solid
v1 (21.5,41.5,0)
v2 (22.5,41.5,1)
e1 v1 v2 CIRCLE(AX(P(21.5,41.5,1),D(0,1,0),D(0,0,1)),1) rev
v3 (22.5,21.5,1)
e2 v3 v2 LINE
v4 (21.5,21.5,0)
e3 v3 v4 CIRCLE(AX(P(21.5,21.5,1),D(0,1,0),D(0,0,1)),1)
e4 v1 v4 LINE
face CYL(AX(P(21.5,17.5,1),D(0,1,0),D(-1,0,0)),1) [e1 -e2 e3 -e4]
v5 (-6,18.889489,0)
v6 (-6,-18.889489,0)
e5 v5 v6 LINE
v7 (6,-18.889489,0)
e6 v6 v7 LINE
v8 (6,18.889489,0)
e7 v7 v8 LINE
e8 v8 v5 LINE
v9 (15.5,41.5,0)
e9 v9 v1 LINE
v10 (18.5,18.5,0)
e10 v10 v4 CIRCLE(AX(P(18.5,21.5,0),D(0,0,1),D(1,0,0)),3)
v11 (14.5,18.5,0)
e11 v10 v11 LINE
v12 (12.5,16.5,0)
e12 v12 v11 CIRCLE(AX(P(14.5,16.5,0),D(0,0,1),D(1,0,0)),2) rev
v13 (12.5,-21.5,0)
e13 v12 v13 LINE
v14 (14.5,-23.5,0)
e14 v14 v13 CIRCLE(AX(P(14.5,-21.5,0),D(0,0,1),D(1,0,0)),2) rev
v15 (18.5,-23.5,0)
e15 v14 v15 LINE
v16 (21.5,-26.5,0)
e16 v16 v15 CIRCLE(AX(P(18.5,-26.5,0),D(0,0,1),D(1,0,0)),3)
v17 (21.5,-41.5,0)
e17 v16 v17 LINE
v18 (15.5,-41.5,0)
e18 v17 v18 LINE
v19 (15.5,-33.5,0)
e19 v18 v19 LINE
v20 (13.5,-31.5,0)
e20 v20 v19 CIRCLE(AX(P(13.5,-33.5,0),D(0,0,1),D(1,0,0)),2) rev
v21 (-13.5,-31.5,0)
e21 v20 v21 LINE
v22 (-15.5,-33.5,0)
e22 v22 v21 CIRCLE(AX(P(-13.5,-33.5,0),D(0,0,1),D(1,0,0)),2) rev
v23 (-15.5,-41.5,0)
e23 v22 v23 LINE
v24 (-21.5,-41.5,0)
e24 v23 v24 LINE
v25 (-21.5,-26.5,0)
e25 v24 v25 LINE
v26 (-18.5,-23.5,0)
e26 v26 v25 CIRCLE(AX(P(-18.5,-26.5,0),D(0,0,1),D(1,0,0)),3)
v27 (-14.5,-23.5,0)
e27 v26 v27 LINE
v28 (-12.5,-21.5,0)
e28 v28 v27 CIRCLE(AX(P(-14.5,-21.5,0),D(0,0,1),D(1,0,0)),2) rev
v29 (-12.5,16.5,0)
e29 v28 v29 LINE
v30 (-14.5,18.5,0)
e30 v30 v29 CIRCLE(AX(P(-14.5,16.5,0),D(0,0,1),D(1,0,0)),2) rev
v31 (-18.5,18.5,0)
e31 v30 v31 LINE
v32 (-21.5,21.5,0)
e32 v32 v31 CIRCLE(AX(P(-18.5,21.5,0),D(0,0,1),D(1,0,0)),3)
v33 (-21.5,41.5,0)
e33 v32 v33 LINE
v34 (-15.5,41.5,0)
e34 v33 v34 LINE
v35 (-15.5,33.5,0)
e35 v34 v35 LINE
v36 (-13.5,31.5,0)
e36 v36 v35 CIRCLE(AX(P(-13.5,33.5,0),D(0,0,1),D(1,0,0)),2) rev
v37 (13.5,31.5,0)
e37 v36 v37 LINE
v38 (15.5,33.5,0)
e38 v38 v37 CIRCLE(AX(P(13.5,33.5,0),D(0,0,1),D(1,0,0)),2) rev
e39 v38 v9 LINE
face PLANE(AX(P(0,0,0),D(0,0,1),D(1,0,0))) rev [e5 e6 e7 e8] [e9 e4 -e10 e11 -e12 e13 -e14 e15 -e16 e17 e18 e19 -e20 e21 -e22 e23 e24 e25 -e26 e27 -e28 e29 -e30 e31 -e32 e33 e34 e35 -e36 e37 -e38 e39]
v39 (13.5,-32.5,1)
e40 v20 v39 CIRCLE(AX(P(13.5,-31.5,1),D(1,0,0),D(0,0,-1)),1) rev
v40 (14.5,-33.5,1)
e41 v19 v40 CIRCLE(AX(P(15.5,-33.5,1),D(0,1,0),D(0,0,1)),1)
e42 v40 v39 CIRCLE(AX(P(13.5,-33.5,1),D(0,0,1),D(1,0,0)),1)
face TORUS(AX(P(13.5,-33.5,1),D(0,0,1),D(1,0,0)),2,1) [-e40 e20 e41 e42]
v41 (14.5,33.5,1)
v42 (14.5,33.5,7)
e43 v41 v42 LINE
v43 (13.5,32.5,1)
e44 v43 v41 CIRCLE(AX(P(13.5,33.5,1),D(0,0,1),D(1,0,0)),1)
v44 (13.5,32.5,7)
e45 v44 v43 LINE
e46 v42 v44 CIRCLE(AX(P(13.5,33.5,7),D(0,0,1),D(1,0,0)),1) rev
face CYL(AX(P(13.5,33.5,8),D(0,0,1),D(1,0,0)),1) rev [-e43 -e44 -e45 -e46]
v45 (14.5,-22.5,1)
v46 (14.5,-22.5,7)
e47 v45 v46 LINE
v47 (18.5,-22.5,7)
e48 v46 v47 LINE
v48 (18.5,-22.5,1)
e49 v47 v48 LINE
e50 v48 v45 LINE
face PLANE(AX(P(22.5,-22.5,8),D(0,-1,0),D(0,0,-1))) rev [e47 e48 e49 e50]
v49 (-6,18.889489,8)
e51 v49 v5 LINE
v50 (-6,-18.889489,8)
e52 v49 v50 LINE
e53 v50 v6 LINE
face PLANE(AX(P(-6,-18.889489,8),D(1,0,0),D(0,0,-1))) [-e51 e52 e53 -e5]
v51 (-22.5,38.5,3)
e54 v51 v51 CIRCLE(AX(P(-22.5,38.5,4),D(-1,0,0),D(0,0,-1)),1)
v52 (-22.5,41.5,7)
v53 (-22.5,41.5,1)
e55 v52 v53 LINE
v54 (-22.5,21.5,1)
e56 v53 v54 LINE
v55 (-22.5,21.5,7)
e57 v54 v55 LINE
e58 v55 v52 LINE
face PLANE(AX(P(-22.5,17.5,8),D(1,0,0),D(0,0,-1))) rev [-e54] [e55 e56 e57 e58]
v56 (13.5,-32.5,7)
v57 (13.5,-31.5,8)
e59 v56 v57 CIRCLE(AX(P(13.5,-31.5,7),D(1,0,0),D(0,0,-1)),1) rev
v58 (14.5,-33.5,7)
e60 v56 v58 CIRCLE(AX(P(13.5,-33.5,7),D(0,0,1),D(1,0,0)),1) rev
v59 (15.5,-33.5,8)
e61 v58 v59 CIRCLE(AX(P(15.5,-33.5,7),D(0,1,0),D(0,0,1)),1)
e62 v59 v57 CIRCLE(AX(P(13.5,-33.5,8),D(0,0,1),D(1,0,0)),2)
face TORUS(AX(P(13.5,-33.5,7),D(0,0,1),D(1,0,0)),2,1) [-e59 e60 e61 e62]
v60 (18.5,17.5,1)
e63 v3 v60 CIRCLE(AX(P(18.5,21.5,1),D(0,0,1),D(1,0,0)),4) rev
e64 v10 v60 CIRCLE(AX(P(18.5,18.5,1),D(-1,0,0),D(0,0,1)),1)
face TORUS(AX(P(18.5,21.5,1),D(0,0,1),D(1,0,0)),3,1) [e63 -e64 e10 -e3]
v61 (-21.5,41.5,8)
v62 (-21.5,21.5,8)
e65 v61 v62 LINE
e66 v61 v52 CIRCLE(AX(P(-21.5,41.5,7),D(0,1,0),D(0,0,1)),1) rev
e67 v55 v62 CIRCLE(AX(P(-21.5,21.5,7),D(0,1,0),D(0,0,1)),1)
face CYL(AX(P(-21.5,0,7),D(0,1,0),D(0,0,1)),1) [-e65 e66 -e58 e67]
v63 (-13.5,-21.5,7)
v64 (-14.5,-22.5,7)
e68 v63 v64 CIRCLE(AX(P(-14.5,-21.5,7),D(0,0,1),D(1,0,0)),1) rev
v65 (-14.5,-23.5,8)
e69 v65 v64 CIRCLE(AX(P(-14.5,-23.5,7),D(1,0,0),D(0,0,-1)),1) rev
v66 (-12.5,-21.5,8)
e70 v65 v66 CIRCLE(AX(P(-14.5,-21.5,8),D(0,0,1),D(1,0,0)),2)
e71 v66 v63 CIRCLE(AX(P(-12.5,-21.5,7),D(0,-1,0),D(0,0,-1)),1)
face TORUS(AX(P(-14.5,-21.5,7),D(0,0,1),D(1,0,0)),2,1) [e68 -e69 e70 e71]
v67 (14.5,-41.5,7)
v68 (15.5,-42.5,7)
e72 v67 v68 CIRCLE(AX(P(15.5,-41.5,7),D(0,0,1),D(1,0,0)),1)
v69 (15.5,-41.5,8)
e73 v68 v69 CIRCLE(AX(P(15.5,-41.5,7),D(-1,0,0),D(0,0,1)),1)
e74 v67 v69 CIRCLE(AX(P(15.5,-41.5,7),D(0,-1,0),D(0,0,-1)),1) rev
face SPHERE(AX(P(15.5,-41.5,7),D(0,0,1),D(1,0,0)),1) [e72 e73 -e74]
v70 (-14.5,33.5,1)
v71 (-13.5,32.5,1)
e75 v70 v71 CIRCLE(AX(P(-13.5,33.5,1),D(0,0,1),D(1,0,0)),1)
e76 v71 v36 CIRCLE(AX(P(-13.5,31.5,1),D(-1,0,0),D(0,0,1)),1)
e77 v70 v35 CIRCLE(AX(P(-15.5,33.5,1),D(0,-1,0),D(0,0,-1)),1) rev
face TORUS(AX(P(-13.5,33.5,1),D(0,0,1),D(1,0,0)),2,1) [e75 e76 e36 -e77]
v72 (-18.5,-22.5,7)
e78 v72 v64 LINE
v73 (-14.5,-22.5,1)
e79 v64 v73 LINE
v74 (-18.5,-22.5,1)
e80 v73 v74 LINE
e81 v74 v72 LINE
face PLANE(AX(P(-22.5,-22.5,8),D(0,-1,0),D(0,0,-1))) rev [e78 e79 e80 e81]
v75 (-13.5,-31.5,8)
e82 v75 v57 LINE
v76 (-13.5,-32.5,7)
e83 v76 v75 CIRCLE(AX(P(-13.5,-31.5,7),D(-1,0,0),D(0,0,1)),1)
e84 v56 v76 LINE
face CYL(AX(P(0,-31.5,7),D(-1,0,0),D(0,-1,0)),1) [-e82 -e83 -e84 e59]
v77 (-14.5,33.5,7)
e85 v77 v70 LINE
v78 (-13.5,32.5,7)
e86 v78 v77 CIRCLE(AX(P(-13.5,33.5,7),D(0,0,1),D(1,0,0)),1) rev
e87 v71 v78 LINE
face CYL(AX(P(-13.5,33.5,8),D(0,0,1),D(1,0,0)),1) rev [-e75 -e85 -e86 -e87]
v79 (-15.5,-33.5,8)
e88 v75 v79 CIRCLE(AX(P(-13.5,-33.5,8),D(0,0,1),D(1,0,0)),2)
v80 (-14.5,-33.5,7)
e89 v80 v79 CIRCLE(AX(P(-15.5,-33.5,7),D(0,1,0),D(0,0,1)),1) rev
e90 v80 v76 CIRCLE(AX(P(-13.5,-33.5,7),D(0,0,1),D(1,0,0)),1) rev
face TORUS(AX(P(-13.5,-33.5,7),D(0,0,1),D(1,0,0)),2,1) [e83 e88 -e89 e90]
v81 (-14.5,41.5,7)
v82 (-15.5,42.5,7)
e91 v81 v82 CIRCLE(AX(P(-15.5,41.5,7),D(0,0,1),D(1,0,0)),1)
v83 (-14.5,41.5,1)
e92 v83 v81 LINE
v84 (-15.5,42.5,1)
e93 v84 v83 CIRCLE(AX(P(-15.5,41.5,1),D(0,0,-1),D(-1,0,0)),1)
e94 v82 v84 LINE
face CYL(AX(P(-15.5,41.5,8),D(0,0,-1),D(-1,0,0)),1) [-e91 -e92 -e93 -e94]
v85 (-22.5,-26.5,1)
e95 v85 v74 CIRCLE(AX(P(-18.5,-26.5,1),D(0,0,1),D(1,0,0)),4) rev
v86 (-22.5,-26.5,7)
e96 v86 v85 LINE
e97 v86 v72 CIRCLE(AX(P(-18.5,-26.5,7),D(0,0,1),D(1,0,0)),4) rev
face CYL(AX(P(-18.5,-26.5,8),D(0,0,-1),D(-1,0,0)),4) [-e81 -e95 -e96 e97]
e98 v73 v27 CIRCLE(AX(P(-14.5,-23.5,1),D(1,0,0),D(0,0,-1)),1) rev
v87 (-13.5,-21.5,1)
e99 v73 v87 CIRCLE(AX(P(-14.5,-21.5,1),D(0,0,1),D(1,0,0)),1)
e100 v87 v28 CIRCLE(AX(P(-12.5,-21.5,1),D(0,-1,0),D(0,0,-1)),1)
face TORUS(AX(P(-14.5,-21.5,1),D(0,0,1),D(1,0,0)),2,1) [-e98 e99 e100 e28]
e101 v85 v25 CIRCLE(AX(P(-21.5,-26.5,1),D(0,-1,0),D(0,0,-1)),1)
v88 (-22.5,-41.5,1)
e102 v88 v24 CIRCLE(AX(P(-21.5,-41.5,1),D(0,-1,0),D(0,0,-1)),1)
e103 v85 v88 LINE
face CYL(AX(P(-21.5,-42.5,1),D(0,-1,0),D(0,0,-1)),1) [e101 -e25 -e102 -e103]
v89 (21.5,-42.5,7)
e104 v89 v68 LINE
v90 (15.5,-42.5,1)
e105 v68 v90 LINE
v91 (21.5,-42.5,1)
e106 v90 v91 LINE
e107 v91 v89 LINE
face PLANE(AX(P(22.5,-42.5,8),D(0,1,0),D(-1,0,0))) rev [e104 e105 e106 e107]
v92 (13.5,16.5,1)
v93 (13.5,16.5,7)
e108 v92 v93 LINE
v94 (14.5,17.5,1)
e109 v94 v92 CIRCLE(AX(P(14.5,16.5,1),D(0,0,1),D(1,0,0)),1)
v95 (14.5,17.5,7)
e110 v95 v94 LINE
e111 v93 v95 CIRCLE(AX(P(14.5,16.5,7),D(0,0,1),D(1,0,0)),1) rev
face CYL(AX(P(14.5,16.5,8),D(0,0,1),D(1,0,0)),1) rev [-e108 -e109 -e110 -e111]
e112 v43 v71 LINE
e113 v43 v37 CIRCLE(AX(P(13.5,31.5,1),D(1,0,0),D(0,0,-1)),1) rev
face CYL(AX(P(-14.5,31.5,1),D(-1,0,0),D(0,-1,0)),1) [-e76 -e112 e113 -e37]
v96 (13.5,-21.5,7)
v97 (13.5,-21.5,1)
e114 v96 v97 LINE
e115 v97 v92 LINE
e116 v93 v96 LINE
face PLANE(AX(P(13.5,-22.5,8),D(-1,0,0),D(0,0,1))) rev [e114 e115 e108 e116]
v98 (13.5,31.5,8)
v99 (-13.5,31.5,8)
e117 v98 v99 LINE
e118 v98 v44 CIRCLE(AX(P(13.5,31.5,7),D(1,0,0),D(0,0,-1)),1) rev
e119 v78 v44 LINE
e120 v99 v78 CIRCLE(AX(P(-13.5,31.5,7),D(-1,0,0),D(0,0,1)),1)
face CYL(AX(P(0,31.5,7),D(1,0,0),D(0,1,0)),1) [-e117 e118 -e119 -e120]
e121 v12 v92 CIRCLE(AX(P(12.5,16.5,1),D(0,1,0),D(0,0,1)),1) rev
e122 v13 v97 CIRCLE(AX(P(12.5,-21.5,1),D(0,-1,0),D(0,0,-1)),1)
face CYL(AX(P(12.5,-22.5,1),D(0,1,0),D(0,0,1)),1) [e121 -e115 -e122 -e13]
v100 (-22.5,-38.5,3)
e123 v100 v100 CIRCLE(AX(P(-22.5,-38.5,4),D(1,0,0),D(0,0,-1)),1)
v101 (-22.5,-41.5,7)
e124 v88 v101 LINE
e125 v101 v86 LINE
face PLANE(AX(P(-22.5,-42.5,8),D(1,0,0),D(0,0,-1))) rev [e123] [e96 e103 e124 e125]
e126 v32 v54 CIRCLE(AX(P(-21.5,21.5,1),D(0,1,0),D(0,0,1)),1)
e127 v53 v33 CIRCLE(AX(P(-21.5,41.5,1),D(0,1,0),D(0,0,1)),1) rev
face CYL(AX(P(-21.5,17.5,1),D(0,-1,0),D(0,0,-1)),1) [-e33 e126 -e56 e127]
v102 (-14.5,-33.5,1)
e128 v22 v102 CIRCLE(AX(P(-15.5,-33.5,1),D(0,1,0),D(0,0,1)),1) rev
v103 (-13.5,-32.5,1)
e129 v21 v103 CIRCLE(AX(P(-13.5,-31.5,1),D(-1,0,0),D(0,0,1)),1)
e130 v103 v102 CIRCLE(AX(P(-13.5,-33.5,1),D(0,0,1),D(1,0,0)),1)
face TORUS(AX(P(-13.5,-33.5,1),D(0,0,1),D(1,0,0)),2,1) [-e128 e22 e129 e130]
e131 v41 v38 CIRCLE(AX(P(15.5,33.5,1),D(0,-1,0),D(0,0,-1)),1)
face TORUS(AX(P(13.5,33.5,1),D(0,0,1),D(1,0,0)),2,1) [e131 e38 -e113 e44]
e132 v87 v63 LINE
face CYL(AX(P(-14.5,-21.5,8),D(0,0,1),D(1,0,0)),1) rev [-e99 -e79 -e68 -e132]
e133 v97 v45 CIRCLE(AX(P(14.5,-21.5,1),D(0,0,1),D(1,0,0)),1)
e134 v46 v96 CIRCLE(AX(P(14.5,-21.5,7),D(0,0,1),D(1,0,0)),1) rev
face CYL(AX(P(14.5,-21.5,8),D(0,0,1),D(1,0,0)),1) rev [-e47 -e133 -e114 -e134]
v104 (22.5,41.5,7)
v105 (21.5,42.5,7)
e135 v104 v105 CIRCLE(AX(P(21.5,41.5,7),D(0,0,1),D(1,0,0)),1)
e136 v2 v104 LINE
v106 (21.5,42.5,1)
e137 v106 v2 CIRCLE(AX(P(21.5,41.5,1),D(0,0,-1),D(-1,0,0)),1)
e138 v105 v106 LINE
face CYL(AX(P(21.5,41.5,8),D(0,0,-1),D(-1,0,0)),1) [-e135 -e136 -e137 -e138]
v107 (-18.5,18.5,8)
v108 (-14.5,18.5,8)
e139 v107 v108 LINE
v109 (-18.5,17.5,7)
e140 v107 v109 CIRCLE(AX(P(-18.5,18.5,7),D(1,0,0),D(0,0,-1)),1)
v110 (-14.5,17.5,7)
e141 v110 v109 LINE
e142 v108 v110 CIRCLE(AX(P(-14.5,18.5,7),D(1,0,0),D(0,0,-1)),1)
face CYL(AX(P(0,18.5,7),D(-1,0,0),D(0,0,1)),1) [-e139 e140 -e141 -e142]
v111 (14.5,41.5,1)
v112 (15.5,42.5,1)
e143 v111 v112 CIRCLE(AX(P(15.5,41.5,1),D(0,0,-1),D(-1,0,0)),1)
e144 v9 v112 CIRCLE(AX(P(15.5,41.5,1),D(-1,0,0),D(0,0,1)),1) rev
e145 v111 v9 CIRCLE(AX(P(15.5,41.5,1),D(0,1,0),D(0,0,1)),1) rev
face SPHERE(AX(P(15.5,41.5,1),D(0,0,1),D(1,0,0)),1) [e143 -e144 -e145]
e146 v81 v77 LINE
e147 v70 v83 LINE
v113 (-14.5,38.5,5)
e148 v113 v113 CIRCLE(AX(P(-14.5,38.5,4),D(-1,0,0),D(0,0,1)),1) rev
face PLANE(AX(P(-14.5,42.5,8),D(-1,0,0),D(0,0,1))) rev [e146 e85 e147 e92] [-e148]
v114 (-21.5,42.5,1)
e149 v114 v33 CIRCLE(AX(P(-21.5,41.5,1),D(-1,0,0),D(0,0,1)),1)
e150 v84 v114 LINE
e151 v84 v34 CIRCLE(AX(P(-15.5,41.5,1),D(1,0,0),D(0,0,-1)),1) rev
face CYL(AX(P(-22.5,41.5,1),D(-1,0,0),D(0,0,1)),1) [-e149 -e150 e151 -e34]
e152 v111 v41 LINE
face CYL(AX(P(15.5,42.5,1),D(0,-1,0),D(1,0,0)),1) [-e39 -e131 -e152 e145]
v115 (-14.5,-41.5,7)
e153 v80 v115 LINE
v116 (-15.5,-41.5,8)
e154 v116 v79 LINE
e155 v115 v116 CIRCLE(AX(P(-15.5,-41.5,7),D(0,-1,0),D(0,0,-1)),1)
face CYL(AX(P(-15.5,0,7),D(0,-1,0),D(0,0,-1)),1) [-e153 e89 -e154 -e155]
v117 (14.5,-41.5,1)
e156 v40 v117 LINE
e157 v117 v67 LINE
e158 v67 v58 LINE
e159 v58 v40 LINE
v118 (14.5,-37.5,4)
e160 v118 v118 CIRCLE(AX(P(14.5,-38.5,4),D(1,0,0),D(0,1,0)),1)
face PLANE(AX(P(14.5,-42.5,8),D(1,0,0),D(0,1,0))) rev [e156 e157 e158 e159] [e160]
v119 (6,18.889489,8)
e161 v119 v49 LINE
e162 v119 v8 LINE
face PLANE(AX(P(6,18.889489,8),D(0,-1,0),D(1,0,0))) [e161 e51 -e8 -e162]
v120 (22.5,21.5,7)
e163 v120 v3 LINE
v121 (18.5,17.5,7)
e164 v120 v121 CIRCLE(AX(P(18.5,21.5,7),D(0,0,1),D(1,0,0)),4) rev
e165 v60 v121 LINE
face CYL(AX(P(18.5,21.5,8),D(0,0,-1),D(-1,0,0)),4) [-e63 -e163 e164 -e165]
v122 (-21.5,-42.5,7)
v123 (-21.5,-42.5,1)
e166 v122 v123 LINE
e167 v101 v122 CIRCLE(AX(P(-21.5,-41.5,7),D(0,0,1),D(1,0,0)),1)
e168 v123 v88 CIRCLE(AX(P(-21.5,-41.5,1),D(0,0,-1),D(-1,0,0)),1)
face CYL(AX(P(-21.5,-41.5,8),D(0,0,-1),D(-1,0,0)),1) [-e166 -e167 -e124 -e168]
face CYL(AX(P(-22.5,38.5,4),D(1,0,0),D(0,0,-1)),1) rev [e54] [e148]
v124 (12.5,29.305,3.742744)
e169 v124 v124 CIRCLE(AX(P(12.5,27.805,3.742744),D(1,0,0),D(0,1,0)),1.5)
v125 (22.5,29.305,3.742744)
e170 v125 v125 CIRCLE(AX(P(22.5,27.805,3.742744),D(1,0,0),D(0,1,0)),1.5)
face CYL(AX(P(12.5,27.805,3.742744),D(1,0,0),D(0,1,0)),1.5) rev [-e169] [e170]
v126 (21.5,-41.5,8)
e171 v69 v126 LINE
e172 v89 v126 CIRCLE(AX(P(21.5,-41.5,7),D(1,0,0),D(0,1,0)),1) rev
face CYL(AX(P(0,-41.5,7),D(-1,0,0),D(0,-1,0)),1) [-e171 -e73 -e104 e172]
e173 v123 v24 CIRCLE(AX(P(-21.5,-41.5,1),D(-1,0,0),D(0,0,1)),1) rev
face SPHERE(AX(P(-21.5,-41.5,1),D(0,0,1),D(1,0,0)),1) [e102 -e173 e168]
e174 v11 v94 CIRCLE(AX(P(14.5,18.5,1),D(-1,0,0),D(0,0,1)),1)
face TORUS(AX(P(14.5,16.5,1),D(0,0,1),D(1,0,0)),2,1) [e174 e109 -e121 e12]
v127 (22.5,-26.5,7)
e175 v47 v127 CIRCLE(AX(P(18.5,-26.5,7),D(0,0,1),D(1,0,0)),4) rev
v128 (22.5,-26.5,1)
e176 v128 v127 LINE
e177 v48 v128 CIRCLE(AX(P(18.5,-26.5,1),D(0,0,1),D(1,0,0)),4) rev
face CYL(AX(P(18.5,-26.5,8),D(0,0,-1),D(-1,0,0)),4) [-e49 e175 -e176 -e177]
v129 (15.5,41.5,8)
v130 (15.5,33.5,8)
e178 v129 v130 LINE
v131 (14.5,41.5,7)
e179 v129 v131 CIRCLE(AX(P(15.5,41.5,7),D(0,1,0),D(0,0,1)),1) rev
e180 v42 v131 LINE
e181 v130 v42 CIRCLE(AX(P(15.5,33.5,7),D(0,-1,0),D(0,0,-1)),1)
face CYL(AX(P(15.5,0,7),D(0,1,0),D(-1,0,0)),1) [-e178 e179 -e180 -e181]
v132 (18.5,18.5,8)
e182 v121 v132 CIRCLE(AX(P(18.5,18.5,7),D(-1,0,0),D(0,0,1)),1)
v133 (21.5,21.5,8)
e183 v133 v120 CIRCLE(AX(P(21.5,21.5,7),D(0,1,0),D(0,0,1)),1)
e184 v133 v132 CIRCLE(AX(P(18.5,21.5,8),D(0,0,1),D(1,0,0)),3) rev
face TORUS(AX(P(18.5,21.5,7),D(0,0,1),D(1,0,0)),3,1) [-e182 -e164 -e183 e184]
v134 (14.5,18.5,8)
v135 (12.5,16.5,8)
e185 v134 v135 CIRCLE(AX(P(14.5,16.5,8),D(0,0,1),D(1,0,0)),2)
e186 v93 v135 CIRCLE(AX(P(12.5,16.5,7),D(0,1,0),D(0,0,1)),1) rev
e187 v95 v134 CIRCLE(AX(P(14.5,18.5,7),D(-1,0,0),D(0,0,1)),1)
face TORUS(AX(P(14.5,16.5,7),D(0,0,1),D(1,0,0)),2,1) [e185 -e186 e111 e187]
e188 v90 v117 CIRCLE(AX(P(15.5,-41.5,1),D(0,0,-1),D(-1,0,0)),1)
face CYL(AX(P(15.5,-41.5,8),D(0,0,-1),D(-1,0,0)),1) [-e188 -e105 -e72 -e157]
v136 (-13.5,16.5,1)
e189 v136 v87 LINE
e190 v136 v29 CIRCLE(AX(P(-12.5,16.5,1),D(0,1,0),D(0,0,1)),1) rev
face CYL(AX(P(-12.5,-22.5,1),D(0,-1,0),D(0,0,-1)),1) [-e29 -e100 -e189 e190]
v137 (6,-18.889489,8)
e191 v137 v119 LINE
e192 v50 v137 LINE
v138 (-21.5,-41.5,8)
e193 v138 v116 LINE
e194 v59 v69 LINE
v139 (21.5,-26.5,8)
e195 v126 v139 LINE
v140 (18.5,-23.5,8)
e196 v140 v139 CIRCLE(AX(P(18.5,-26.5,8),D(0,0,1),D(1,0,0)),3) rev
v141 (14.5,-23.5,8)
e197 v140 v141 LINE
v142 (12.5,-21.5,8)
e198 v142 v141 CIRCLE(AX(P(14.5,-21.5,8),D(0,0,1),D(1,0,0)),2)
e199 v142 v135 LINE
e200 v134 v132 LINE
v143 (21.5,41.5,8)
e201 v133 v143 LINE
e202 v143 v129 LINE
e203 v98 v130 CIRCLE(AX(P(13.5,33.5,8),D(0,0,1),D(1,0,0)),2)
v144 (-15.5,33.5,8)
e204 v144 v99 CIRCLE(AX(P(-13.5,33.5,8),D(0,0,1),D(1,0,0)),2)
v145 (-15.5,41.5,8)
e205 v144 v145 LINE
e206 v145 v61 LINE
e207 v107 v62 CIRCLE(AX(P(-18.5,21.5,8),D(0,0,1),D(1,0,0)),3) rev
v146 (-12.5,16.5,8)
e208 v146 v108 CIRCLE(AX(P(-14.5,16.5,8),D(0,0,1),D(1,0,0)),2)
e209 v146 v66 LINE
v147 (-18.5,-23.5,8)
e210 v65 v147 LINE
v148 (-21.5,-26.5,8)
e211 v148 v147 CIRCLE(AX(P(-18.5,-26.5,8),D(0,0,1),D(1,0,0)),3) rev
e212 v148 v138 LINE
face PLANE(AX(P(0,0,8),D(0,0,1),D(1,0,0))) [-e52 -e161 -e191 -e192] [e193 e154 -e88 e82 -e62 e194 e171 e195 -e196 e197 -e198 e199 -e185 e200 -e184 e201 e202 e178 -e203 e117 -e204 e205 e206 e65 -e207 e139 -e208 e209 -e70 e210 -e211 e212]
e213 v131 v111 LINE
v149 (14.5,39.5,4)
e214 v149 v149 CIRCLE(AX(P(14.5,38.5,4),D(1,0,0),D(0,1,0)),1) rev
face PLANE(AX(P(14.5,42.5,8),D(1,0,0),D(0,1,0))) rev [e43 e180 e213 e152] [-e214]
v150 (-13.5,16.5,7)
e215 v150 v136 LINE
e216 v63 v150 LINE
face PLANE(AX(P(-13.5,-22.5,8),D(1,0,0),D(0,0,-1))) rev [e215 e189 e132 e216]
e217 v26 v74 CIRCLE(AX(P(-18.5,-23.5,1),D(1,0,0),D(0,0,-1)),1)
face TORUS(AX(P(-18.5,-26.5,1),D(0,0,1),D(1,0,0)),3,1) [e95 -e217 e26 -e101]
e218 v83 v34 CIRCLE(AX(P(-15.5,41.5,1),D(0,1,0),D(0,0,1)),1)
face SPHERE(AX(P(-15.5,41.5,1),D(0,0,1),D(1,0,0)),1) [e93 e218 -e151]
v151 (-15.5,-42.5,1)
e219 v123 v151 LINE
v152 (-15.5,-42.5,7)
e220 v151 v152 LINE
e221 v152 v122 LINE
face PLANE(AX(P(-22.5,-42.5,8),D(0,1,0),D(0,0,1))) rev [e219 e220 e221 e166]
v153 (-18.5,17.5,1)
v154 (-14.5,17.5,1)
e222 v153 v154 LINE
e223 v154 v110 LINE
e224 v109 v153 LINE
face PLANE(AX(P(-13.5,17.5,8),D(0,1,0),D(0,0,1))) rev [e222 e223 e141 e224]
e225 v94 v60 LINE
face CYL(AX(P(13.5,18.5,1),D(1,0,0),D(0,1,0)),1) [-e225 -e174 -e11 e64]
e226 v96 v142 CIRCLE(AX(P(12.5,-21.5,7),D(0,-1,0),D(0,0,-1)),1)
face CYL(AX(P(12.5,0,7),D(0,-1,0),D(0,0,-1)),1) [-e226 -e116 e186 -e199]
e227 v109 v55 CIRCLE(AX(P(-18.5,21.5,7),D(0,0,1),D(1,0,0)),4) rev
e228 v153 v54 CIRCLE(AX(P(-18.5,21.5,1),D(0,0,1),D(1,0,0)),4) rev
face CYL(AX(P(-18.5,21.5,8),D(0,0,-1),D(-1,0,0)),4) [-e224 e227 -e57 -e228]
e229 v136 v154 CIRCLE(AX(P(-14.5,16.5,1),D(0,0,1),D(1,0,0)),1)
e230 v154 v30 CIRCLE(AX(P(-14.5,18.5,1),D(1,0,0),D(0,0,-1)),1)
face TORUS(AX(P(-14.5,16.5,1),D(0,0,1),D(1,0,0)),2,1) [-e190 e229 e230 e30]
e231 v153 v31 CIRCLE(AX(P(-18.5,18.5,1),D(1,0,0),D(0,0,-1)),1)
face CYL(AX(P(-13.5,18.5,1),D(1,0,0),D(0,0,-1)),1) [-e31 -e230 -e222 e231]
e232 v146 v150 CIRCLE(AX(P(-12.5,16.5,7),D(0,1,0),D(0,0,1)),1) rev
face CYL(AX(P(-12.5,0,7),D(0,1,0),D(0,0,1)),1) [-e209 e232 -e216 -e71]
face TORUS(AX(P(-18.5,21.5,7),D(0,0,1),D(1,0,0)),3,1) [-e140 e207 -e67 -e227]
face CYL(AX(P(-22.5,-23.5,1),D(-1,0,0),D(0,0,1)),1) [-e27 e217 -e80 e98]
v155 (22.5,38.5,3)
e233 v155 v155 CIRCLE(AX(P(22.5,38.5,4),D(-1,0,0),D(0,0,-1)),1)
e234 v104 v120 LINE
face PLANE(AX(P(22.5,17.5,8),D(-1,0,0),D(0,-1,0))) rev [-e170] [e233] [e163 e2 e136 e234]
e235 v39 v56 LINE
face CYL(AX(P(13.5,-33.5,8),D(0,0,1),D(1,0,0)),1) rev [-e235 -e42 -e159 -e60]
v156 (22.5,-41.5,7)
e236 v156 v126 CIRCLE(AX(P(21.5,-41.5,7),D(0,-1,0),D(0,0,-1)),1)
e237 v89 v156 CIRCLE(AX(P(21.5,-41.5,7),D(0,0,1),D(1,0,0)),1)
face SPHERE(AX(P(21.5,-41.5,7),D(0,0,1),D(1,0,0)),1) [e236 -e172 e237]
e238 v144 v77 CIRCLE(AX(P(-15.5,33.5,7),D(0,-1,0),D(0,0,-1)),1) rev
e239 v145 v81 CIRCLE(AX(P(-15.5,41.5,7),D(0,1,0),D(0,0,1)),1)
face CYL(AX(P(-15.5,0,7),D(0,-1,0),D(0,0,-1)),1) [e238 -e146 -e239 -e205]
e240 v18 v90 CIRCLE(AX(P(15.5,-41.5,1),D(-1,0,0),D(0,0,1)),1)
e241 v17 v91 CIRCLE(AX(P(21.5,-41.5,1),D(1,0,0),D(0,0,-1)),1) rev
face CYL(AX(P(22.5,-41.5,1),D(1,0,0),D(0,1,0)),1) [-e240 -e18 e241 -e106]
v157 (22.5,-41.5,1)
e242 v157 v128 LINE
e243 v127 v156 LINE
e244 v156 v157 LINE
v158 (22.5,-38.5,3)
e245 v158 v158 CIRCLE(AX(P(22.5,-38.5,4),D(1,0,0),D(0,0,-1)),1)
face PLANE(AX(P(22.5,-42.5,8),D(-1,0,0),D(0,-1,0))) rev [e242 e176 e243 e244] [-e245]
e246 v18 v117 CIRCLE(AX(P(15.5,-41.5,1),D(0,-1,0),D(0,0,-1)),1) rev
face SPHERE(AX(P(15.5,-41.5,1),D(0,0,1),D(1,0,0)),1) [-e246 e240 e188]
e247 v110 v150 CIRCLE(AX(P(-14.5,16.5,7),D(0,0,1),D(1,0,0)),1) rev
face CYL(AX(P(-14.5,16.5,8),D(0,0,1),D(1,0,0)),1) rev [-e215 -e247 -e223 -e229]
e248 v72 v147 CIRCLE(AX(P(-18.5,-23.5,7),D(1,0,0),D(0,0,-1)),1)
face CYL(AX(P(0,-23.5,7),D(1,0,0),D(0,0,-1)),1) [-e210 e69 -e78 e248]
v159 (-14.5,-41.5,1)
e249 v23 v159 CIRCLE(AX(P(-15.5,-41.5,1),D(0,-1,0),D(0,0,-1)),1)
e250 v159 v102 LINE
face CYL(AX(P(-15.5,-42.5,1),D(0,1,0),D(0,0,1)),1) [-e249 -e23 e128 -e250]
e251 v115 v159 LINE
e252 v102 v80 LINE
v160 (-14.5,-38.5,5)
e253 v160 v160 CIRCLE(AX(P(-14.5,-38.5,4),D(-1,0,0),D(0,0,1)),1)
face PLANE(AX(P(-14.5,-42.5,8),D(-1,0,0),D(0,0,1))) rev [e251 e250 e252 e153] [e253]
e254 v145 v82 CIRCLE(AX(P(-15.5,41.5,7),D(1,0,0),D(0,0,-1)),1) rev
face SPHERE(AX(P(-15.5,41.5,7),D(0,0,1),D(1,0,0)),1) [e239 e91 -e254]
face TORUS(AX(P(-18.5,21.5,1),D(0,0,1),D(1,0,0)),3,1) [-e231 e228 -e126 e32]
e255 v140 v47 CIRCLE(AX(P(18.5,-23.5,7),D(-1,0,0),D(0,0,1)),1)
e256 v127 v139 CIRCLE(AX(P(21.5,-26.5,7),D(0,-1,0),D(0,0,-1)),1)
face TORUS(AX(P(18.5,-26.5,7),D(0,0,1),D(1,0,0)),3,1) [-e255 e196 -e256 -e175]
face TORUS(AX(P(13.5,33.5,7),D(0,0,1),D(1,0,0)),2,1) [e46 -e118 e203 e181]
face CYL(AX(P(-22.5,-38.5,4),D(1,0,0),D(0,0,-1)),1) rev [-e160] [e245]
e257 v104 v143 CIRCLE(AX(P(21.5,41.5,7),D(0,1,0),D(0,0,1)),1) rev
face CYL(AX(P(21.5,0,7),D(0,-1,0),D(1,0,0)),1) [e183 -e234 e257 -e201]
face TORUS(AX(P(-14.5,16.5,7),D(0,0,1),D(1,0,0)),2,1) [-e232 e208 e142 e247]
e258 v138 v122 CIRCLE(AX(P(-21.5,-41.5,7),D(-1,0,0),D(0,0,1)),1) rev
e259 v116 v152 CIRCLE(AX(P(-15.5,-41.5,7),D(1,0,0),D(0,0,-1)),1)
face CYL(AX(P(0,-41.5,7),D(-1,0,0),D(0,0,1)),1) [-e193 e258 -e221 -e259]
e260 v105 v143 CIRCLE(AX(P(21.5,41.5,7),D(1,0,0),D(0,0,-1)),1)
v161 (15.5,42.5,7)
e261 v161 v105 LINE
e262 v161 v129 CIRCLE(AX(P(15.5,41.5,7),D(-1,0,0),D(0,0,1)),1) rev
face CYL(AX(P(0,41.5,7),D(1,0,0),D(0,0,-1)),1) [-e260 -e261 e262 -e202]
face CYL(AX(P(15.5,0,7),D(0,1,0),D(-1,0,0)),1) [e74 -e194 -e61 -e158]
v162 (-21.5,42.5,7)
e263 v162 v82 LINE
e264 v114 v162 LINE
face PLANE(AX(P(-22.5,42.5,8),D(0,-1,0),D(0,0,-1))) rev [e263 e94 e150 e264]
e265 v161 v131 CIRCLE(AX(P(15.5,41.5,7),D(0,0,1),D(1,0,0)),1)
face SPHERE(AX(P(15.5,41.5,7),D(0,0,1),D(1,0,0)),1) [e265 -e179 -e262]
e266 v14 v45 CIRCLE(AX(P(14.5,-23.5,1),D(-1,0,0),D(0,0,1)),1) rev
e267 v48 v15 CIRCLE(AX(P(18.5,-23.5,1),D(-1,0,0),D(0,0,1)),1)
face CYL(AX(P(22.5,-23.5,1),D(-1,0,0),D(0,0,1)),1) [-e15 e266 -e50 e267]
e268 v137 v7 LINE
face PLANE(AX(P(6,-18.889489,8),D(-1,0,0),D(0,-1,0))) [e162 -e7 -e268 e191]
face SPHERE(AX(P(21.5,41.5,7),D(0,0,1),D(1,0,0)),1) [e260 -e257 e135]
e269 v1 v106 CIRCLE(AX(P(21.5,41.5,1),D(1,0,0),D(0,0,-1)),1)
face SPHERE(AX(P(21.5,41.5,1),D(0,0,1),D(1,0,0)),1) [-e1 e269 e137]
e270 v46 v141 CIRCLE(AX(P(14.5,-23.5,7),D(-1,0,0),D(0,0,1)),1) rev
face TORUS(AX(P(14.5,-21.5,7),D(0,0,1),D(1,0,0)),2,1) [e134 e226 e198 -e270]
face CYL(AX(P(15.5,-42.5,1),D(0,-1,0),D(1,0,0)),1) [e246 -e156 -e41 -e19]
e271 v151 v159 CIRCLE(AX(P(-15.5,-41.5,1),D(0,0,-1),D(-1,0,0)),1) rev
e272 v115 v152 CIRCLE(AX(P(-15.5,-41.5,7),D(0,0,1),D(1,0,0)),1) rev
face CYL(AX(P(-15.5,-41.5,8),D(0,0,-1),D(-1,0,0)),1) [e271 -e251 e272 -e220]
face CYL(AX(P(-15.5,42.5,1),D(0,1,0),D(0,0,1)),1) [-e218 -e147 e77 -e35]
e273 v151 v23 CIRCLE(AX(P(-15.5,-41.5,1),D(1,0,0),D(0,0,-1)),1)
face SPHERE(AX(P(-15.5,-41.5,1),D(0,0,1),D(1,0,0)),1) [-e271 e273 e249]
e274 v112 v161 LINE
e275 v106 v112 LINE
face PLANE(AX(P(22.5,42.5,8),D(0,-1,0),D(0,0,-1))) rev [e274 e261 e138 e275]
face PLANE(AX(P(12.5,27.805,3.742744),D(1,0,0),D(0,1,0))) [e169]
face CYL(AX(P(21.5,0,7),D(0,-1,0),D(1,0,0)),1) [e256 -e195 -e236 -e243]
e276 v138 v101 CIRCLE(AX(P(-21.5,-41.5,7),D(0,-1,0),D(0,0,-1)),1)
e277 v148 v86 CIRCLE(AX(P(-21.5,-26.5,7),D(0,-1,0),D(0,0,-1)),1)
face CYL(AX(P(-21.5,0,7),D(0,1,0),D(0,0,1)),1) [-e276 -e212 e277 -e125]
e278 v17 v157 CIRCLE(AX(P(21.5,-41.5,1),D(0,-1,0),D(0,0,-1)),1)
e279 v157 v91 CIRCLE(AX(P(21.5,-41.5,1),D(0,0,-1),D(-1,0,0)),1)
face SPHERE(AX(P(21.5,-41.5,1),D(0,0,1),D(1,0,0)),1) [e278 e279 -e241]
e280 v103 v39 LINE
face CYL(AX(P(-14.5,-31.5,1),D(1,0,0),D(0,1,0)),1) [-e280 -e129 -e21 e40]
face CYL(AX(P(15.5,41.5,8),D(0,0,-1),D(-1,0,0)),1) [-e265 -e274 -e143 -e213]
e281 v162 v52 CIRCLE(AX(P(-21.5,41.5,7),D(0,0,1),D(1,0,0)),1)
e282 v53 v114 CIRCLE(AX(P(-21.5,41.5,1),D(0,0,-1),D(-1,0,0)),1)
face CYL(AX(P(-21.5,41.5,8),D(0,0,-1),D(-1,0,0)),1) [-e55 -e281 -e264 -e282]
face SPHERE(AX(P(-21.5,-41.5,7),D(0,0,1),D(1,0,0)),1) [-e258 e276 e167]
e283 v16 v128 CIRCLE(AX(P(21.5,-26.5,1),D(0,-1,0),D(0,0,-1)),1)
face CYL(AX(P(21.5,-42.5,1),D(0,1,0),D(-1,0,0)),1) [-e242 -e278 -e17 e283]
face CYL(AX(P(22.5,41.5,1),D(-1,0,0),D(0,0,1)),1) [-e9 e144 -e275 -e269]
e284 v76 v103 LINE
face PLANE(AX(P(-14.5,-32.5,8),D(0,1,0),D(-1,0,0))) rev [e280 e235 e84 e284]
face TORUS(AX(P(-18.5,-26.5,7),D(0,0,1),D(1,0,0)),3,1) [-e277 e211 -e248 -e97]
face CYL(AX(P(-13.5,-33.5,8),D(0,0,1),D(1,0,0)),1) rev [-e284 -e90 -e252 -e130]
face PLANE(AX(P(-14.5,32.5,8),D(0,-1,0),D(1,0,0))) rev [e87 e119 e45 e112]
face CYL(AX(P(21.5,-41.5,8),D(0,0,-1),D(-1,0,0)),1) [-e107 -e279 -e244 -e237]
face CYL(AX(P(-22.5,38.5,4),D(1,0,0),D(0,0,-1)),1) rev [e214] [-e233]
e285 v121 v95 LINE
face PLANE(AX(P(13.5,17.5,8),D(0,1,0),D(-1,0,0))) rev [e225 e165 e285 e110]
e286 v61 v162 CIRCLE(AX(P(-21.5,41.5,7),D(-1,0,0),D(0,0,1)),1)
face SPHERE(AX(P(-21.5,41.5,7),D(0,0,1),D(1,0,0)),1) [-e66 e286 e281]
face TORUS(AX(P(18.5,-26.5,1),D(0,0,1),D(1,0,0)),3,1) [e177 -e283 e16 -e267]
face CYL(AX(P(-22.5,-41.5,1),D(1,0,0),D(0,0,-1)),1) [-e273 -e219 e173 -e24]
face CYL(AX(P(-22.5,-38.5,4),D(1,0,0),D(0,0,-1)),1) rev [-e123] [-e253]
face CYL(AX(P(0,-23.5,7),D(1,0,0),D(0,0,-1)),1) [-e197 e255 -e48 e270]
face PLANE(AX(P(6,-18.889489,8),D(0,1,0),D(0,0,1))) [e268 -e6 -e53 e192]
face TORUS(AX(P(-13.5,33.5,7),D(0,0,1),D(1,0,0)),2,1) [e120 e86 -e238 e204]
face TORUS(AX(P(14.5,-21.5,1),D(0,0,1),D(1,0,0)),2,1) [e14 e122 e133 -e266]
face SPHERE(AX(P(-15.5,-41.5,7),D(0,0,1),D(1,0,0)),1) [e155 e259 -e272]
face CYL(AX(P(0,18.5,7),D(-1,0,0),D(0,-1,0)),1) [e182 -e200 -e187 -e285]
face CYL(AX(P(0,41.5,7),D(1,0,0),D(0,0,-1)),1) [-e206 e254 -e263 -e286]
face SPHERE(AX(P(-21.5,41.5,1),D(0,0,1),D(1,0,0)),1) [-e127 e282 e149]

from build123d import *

# Parameters (mm, degrees)
SKETCH2_W           = 12
SKETCH2_H           = 37.77897706
BOSS_EXTRUDE1_DEPTH = 8
FILLET1_R           = 1
FILLET2_R           = 4
SKETCH3_R           = 1
CUT_EXTRUDE1_DEPTH  = 57.914409437
SKETCH4_R           = 1.5
CUT_EXTRUDE2_DEPTH  = 10


with BuildPart() as part:
    # Sketch2 → Boss-Extrude1 (new body)
    with BuildSketch(Plane.XY):
        Polygon((-22.5, -42.5), (-22.5, -22.5), (-13.5, -22.5), (-13.5, 17.5), (-22.5, 17.5), (-22.5, 42.5), (-14.5, 42.5), (-14.5, 32.5), (14.5, 32.5), (14.5, 42.5), (22.5, 42.5), (22.5, 17.5), (13.5, 17.5), (13.5, -22.5), (22.5, -22.5), (22.5, -42.5), (14.5, -42.5), (14.5, -32.5), (-14.5, -32.5), (-14.5, -42.5), align=None)
        Rectangle(SKETCH2_W, SKETCH2_H, mode=Mode.SUBTRACT)
    extrude(amount=BOSS_EXTRUDE1_DEPTH)

    # Fillet1
    fillet1_edges = [part.edges().sort_by_distance(p)[0] for p in [
        (0, -32.5, 8),
        (14.5, -37.5, 8),
        (-22.5, -32.5, 0),
        (-18, -22.5, 0),
        (-13.5, -2.5, 0),
        (-18, 17.5, 0),
        (18.5, -42.5, 8),
        (-22.5, 30, 0),
        (-18.5, 42.5, 0),
        (-14.5, 37.5, 0),
        (0, 32.5, 0),
        (14.5, 37.5, 0),
        (18.5, 42.5, 0),
        (22.5, 30, 0),
        (18, 17.5, 0),
        (13.5, -2.5, 0),
        (18, -22.5, 0),
        (22.5, -32.5, 8),
        (22.5, -32.5, 0),
        (18.5, -42.5, 0),
        (14.5, -37.5, 0),
        (0, -32.5, 0),
        (-14.5, -37.5, 0),
        (-18.5, -42.5, 0),
        (18, -22.5, 8),
        (13.5, -2.5, 8),
        (-22.5, -42.5, 4),
        (-13.5, -22.5, 4),
        (-13.5, 17.5, 4),
        (-22.5, 42.5, 4),
        (-14.5, 42.5, 4),
        (-14.5, 32.5, 4),
        (14.5, 32.5, 4),
        (14.5, 42.5, 4),
        (22.5, 42.5, 4),
        (13.5, 17.5, 4),
        (13.5, -22.5, 4),
        (22.5, -42.5, 4),
        (14.5, -42.5, 4),
        (14.5, -32.5, 4),
        (-14.5, -32.5, 4),
        (-14.5, -42.5, 4),
        (18, 17.5, 8),
        (22.5, 30, 8),
        (18.5, 42.5, 8),
        (14.5, 37.5, 8),
        (-18.5, -42.5, 8),
        (0, 32.5, 8),
        (-14.5, 37.5, 8),
        (-18.5, 42.5, 8),
        (-22.5, 30, 8),
        (-18, 17.5, 8),
        (-13.5, -2.5, 8),
        (-18, -22.5, 8),
        (-22.5, -32.5, 8),
        (-14.5, -37.5, 8),
    ]]
    fillet(fillet1_edges, radius=FILLET1_R)

    # Fillet2
    # the kernel refuses this fillet: 4 mm, written as the material it takes off along each edge
    with BuildSketch(Plane(origin=(18.5, 21.5, 8), x_dir=(0, -1, 0), z_dir=(-1, 0, 0))) as fillet2_piece_1:
        with BuildLine():
            CenterArc((3, -1), 1, 0, 90)
            Line((4, -1), (4, 0))
            Line((4, 0), (3, 0))
        make_face()
    revolve(axis=Axis((18.5, 21.5, 8), (0, 0, 1)), revolution_arc=90, mode=Mode.SUBTRACT)
    with BuildSketch(Plane(origin=(18.5, 21.5, 0), x_dir=(1, 0, 0), z_dir=(0, 1, 0))) as fillet2_piece_2:
        with BuildLine():
            CenterArc((3, -1), 1, 0, 90)
            Line((4, -1), (4, 0))
            Line((4, 0), (3, 0))
        make_face()
    revolve(axis=Axis((18.5, 21.5, 0), (0, 0, -1)), revolution_arc=90, mode=Mode.SUBTRACT)
    with BuildSketch(Plane(origin=(18.5, -26.5, 8), x_dir=(1, 0, 0), z_dir=(0, -1, 0))) as fillet2_piece_3:
        with BuildLine():
            CenterArc((3, -1), 1, 0, 90)
            Line((4, -1), (4, 0))
            Line((4, 0), (3, 0))
        make_face()
    revolve(axis=Axis((18.5, -26.5, 8), (0, 0, 1)), revolution_arc=90, mode=Mode.SUBTRACT)
    with BuildSketch(Plane(origin=(18.5, -26.5, 0), x_dir=(0, 1, 0), z_dir=(-1, 0, 0))) as fillet2_piece_4:
        with BuildLine():
            CenterArc((3, -1), 1, 0, 90)
            Line((4, -1), (4, 0))
            Line((4, 0), (3, 0))
        make_face()
    revolve(axis=Axis((18.5, -26.5, 0), (0, 0, -1)), revolution_arc=90, mode=Mode.SUBTRACT)
    with BuildSketch(Plane(origin=(-18.5, 21.5, 8), x_dir=(-1, 0, 0), z_dir=(0, 1, 0))) as fillet2_piece_5:
        with BuildLine():
            CenterArc((3, -1), 1, 0, 90)
            Line((4, -1), (4, 0))
            Line((4, 0), (3, 0))
        make_face()
    revolve(axis=Axis((-18.5, 21.5, 8), (0, 0, 1)), revolution_arc=90, mode=Mode.SUBTRACT)
    with BuildSketch(Plane(origin=(-18.5, 21.5, 0), x_dir=(0, -1, 0), z_dir=(1, 0, 0))) as fillet2_piece_6:
        with BuildLine():
            CenterArc((3, -1), 1, 0, 90)
            Line((4, -1), (4, 0))
            Line((4, 0), (3, 0))
        make_face()
    revolve(axis=Axis((-18.5, 21.5, 0), (0, 0, -1)), revolution_arc=90, mode=Mode.SUBTRACT)
    with BuildSketch(Plane(origin=(-18.5, -26.5, 8), x_dir=(0, 1, 0), z_dir=(1, 0, 0))) as fillet2_piece_7:
        with BuildLine():
            CenterArc((3, -1), 1, 0, 90)
            Line((4, -1), (4, 0))
            Line((4, 0), (3, 0))
        make_face()
    revolve(axis=Axis((-18.5, -26.5, 8), (0, 0, 1)), revolution_arc=90, mode=Mode.SUBTRACT)
    with BuildSketch(Plane(origin=(-18.5, -26.5, 0), x_dir=(-1, 0, 0), z_dir=(0, -1, 0))) as fillet2_piece_8:
        with BuildLine():
            CenterArc((3, -1), 1, 0, 90)
            Line((4, -1), (4, 0))
            Line((4, 0), (3, 0))
        make_face()
    revolve(axis=Axis((-18.5, -26.5, 0), (0, 0, -1)), revolution_arc=90, mode=Mode.SUBTRACT)
    with BuildSketch(Plane(origin=(-22.5, 17.5, 0), x_dir=(1, 0, 0), z_dir=(0, 0, 1)), Plane(origin=(-22.5, -22.5, 0), x_dir=(0, -1, 0), z_dir=(0, 0, 1))) as fillet2_piece_9:
        with BuildLine():
            CenterArc((FILLET2_R, FILLET2_R), FILLET2_R, 180, 90)
            Line((0, FILLET2_R), (0, 0))
            Line((0, 0), (FILLET2_R, 0))
        make_face()
    extrude(amount=8, mode=Mode.SUBTRACT)
    with BuildSketch(Plane(origin=(22.5, -22.5, 0), x_dir=(0, -1, 0), z_dir=(0, 0, 1)), Plane(origin=(22.5, 17.5, 0), x_dir=(-1, 0, 0), z_dir=(0, 0, 1))) as fillet2_piece_10:
        with BuildLine():
            CenterArc((FILLET2_R, -FILLET2_R), FILLET2_R, 90, 90)
            Line((0, -FILLET2_R), (0, 0))
            Line((0, 0), (FILLET2_R, 0))
        make_face()
    extrude(amount=8, mode=Mode.SUBTRACT)

    # Sketch3 → Cut-Extrude1 (cut, symmetric)
    with BuildSketch(Plane(origin=(-14.5, 0, 0), x_dir=(0, 0, -1), z_dir=(1, 0, 0))):
        with Locations((-4, -38.5)):
            Circle(SKETCH3_R)
    cut_extrude1 = extrude(amount=CUT_EXTRUDE1_DEPTH, both=True, mode=Mode.SUBTRACT)

    # Mirror1: Cut-Extrude1 across plane
    add(cut_extrude1.mirror(Plane.ZX), mode=Mode.SUBTRACT)

    # Sketch4 → Cut-Extrude2 (cut)
    with BuildSketch(Plane(origin=(22.5, 0, 0), x_dir=(0, 0, -1), z_dir=(1, 0, 0))):
        with Locations(Location((-3.742743768, 27.805, 0), (0, 0, 90))):
            Circle(SKETCH4_R)
    extrude(amount=-CUT_EXTRUDE2_DEPTH, mode=Mode.SUBTRACT)


solid = part.part
